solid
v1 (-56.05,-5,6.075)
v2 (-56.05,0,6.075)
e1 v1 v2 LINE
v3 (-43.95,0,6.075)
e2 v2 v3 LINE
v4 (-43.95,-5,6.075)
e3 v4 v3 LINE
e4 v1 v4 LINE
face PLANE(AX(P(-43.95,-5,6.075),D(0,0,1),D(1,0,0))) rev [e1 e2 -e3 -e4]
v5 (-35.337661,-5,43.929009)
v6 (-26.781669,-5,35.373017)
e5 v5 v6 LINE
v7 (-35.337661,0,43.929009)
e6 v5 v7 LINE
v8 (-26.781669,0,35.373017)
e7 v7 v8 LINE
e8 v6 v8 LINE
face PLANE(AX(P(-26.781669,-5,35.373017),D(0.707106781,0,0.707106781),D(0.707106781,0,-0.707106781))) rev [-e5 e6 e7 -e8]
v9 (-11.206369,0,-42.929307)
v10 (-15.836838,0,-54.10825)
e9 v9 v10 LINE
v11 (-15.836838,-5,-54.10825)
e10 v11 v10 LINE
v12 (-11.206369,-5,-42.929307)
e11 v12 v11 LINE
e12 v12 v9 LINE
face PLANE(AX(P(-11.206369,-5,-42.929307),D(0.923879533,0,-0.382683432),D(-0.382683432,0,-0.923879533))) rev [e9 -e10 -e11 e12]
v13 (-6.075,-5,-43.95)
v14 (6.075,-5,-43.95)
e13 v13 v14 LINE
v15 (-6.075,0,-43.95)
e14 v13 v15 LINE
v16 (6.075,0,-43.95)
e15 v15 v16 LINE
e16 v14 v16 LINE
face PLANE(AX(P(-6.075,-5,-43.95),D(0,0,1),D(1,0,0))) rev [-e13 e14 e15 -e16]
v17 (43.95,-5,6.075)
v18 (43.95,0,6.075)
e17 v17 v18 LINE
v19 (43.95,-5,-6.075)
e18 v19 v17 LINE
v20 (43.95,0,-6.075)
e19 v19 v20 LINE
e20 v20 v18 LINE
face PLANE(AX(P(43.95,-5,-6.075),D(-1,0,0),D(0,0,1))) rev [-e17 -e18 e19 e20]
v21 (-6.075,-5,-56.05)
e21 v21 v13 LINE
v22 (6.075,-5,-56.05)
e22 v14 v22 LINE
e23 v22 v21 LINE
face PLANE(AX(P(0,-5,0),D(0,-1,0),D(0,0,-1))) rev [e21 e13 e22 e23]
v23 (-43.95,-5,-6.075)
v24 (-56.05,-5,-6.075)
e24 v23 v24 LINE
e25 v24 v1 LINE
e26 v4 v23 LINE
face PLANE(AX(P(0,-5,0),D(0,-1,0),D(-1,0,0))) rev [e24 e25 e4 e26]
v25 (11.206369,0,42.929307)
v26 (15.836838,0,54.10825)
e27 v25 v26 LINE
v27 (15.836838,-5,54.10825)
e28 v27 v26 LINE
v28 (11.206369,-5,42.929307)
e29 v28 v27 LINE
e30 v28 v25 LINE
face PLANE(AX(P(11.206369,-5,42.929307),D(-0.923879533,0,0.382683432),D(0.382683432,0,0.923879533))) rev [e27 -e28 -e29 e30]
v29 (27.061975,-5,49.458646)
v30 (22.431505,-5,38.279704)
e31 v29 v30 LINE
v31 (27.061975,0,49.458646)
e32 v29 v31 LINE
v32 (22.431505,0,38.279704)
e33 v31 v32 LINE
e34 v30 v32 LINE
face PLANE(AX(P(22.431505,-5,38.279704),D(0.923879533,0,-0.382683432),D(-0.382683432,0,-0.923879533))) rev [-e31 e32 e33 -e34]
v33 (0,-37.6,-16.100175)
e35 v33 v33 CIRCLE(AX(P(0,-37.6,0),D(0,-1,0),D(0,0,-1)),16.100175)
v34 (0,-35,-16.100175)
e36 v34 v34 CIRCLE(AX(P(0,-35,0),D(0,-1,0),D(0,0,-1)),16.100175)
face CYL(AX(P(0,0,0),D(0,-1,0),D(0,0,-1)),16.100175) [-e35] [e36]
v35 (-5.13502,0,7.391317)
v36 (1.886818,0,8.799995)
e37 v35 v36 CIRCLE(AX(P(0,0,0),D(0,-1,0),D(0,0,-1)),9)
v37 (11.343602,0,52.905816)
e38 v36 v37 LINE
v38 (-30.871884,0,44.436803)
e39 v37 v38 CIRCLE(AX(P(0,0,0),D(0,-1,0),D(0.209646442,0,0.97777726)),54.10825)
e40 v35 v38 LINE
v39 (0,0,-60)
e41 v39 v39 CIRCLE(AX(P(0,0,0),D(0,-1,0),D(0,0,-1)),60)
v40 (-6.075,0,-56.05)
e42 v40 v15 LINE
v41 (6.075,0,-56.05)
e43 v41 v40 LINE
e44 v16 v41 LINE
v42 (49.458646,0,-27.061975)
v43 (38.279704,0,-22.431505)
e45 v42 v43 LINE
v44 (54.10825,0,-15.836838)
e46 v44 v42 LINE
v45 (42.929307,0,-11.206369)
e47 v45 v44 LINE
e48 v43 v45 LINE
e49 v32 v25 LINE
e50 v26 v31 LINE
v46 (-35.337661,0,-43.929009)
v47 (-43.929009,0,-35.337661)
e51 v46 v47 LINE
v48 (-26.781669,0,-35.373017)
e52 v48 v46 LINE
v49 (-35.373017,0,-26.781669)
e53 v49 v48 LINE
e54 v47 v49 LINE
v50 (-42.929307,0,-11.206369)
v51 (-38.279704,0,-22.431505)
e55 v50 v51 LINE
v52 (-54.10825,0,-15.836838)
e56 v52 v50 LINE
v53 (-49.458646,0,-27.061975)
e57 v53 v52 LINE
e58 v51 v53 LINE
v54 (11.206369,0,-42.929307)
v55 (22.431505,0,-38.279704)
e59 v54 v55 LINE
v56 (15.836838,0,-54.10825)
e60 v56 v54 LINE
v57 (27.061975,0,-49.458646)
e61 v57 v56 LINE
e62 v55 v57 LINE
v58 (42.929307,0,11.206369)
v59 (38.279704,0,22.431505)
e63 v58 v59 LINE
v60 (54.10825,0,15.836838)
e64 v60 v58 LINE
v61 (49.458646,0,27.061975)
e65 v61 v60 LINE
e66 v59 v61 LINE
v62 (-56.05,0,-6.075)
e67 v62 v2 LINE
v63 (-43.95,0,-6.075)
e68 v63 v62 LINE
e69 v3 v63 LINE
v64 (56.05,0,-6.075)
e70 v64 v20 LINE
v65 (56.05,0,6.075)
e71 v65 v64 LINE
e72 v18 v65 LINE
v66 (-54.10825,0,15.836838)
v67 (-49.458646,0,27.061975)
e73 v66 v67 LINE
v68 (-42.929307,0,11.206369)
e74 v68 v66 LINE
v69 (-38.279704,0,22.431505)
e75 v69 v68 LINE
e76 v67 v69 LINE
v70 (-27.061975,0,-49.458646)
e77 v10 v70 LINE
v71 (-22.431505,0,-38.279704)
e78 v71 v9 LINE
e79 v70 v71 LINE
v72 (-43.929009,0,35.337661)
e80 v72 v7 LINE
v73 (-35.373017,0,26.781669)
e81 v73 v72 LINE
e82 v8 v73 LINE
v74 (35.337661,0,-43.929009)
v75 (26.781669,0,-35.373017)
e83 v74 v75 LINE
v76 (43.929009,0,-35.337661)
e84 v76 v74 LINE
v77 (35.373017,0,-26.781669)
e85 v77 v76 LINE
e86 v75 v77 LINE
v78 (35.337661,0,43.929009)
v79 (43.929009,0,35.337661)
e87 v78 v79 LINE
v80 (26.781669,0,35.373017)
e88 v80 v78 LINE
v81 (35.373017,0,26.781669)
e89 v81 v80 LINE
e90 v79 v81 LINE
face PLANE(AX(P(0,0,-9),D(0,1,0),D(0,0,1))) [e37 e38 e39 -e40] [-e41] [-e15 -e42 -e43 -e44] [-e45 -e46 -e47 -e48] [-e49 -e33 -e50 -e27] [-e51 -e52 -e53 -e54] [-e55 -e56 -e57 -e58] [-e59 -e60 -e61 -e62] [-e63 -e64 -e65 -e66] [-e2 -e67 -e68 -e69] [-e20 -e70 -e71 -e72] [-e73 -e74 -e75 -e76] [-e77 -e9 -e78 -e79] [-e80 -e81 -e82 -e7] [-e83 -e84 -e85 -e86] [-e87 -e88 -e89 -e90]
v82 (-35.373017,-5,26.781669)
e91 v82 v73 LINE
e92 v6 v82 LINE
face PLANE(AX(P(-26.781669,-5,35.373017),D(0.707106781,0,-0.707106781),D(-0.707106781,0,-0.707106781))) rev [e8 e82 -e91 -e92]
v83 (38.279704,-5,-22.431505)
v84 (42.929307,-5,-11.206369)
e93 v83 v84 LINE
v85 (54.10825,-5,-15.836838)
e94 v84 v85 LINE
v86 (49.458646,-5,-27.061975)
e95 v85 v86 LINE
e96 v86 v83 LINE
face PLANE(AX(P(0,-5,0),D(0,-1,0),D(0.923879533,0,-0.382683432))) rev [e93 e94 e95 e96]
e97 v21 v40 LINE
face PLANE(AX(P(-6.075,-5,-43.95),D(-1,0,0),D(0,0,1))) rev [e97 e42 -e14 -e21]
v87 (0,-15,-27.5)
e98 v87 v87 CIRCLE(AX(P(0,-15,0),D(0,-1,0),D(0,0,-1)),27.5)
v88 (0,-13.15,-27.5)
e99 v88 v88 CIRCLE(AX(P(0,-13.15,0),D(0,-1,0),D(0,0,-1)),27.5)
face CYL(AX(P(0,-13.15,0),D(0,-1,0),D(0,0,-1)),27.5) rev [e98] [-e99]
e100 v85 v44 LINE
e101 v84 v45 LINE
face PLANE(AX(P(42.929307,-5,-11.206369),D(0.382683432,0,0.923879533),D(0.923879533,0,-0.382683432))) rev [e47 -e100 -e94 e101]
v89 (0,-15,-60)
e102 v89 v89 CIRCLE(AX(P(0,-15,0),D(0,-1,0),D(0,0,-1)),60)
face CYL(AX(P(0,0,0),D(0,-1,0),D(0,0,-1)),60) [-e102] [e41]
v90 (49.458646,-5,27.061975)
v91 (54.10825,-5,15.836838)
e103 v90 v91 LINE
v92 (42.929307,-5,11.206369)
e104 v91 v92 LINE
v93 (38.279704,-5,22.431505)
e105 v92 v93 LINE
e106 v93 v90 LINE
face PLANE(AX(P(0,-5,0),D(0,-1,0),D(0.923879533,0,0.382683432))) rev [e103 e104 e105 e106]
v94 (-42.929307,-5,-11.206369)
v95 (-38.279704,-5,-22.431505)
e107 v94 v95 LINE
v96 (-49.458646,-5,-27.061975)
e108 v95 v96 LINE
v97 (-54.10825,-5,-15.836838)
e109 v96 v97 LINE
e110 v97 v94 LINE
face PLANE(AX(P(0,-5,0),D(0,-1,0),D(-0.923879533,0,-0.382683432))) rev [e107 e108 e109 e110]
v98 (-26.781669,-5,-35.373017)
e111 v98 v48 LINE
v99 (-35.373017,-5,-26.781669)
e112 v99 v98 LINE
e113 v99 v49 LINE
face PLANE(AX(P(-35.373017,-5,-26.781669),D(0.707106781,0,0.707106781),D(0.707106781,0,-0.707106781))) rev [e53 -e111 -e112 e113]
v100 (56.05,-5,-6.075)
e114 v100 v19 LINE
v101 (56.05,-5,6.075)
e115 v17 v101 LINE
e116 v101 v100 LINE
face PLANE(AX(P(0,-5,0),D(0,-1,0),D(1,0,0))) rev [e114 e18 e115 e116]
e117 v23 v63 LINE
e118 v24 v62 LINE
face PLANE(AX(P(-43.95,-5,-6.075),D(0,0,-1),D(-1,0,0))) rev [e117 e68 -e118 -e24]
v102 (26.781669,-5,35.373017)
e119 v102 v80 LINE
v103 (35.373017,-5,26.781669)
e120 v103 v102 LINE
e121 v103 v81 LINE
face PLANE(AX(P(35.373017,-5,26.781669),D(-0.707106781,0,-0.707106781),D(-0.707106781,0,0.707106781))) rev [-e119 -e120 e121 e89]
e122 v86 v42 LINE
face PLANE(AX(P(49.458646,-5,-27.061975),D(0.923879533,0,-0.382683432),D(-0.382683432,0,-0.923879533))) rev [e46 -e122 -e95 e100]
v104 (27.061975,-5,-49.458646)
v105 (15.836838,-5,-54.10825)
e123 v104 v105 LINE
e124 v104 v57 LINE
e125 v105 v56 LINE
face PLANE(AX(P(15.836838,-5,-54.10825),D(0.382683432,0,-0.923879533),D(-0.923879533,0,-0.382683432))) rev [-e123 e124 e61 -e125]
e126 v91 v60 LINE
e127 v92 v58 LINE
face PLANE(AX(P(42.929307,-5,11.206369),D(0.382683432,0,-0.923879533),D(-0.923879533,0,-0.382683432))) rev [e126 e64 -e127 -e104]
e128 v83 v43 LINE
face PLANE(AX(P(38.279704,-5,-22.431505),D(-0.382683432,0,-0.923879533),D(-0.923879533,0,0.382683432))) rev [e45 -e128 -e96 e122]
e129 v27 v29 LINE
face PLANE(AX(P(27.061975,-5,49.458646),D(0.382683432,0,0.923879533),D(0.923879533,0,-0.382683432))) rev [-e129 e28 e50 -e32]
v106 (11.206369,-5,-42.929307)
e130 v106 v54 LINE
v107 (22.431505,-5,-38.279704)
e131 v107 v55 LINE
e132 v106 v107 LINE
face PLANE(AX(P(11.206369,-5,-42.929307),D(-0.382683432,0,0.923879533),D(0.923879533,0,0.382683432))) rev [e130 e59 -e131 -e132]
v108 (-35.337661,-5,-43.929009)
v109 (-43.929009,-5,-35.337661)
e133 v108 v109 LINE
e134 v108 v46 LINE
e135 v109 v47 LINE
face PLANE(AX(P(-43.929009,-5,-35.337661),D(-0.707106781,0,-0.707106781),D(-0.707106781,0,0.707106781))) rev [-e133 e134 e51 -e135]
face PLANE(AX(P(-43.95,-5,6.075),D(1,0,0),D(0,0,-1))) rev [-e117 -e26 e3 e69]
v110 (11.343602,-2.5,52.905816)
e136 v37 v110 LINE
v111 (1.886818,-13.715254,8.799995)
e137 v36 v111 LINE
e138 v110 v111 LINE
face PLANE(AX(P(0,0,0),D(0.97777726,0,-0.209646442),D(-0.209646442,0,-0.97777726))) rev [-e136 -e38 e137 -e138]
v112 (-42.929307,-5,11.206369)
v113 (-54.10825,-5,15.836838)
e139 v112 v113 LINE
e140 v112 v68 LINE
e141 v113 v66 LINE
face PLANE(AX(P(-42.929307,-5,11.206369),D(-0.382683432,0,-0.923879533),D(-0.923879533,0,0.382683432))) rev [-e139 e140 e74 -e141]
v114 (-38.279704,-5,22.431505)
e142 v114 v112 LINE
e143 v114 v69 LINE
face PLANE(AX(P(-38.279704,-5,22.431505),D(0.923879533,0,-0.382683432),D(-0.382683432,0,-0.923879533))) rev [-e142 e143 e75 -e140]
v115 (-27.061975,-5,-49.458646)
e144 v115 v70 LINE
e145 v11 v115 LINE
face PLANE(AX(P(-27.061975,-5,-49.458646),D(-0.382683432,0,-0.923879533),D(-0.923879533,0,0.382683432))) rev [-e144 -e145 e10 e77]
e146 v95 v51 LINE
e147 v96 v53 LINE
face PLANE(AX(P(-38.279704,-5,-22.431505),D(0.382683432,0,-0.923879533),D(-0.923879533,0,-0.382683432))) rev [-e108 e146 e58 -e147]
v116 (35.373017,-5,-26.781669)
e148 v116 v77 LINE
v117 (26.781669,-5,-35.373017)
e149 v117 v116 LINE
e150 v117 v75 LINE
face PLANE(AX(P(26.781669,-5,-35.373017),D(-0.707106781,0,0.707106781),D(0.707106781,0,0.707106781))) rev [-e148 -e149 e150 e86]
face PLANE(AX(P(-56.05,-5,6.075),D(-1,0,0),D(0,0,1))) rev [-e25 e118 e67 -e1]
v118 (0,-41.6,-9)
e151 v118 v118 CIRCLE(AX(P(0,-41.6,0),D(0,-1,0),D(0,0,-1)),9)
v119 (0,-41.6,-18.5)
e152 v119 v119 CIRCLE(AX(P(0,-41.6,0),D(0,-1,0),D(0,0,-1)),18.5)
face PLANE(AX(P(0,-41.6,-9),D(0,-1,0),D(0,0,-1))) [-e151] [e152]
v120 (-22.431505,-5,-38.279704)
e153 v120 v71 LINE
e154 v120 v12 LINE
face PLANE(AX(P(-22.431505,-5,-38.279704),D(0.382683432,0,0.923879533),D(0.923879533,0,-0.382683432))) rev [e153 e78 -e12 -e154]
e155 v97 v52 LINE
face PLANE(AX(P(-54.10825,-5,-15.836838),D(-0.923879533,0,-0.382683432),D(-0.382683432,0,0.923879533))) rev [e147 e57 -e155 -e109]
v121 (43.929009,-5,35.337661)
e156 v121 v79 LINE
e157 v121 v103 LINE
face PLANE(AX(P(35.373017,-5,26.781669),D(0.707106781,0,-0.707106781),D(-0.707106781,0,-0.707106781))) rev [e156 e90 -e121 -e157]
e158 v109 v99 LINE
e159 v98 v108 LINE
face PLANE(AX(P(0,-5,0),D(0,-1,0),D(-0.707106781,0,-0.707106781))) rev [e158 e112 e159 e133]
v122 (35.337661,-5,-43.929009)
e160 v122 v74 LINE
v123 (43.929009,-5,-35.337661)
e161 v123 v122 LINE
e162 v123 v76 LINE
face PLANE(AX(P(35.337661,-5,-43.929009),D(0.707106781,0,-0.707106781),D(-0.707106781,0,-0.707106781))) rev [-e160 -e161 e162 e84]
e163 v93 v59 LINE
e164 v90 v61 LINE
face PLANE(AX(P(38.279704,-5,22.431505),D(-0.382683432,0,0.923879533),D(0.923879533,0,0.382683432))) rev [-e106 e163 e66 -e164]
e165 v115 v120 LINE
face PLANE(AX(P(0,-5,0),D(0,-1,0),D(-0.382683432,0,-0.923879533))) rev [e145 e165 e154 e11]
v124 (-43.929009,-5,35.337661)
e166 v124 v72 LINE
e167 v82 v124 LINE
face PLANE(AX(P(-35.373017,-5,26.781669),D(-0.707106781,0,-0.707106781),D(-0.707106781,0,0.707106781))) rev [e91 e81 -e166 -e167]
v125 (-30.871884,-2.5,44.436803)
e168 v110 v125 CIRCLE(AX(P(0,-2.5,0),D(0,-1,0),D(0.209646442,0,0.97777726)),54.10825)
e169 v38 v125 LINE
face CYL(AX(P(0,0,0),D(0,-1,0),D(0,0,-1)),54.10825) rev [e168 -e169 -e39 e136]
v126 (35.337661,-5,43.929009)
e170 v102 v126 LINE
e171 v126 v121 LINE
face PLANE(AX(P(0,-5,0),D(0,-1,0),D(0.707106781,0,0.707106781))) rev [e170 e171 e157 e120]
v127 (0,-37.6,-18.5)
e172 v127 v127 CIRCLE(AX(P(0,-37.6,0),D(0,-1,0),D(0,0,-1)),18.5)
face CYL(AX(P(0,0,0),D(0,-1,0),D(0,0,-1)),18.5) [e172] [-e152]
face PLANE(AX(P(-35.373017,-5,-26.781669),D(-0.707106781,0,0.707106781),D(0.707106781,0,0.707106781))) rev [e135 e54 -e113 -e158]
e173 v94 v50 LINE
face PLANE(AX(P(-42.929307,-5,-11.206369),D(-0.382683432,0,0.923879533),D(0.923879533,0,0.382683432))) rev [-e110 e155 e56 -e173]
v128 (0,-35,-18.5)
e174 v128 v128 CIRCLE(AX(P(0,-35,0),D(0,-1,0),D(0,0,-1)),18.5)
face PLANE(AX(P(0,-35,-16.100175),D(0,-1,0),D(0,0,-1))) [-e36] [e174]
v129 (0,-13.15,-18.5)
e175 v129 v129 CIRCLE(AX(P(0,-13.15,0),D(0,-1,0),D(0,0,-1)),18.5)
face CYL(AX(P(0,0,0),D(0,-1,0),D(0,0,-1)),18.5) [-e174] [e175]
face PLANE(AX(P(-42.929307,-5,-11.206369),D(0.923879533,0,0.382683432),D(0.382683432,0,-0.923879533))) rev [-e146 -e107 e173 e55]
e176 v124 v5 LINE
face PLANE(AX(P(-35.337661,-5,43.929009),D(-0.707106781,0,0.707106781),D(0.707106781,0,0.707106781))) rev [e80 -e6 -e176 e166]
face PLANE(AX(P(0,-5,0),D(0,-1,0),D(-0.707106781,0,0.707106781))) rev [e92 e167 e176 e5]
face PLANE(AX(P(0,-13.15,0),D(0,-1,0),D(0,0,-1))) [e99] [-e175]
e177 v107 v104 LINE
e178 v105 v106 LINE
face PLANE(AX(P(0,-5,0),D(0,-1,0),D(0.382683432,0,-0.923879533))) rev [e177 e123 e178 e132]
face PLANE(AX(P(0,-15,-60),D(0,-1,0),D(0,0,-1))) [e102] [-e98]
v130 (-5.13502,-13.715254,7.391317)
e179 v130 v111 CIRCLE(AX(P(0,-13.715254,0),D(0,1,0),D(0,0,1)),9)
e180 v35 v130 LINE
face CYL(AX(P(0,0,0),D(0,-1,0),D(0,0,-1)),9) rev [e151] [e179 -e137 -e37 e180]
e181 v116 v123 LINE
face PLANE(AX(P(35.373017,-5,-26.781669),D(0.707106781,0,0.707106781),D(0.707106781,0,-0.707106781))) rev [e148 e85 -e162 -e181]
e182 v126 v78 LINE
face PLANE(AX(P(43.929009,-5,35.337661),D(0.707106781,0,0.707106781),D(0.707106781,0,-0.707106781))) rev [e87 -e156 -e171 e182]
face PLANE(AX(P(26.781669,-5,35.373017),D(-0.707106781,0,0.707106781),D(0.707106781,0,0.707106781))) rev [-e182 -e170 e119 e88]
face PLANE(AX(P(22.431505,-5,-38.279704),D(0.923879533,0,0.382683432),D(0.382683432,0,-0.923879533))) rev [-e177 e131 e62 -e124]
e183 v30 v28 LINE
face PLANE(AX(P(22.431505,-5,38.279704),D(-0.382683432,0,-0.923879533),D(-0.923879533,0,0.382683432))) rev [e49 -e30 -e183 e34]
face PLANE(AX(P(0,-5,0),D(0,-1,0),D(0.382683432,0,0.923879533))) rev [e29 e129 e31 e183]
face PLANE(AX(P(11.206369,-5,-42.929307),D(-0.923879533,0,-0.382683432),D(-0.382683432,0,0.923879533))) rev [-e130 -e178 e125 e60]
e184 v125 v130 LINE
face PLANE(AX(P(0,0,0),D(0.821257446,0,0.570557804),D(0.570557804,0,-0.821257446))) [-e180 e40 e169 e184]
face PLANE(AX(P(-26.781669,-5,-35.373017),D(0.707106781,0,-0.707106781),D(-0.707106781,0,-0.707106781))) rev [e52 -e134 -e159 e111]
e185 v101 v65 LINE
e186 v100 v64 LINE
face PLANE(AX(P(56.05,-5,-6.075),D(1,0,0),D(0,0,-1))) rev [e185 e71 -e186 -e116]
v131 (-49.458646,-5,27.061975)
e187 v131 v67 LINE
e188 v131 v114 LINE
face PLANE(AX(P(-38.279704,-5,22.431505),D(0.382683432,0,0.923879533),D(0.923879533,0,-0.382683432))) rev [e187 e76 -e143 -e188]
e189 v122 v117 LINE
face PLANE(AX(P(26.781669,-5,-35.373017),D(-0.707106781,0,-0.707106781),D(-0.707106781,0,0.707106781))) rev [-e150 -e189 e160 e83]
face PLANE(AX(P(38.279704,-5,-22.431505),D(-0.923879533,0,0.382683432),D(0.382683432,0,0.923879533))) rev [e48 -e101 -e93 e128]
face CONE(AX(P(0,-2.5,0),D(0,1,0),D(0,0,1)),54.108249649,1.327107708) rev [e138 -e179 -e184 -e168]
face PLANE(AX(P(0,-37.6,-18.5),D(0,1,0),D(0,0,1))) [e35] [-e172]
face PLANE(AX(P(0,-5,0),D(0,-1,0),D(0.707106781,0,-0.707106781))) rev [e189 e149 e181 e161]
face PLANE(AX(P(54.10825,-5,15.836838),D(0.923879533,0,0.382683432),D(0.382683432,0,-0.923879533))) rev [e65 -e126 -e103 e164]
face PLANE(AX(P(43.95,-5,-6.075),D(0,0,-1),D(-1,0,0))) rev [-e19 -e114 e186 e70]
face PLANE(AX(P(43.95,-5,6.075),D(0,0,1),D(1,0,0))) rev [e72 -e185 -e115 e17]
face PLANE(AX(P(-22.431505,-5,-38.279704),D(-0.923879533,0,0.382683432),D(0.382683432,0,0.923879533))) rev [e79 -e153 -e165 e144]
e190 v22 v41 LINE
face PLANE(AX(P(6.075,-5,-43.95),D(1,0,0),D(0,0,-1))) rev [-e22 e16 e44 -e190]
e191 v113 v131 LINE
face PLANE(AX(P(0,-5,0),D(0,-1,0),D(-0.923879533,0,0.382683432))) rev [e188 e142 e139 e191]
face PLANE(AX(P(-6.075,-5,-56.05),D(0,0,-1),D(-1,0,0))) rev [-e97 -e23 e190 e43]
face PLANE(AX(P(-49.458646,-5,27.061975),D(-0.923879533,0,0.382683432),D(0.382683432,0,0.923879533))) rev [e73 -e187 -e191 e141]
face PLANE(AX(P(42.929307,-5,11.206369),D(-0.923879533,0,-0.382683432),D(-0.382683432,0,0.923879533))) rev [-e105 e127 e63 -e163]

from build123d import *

# Parameters (mm, degrees)
SKETCH3_W          = 12.15
SKETCH3_H          = 12.1
CUT_EXTRUDE1_DEPTH = 5
CIRPATTERN1_COUNT  = 16
CUT_SWEEP3_ANGLE   = 46.890766
SKETCH8_R          = 27.5
SKETCH8_R_2        = 18.5
CUT_EXTRUDE2_DEPTH = 1.85


# Read off the part's stored shape, not the designer's step: Cut-Sweep3
with BuildPart() as part:
    # Sketch1 → Revolve1 (revolve)
    with BuildSketch(Plane(origin=(0, 0, 0), x_dir=(0, 0, -1), z_dir=(1, 0, 0))):
        Polygon((9, 0), (60, 0), (60, -15), (18.5, -15), (18.5, -35), (16.100175422, -35), (16.100175422, -37.6), (18.5, -37.6), (18.5, -41.6), (9, -41.6), align=None)
    revolve(axis=Axis((0, 0, 0), (0, 1, 0)))

    # Sketch3 → Cut-Extrude1 (cut)
    with BuildSketch(Plane(origin=(0, 0, 0), x_dir=(1, 0, 0), z_dir=(0, 1, 0))):
        with Locations((0, 50)):
            Rectangle(SKETCH3_W, SKETCH3_H)
    cut_extrude1 = extrude(amount=-CUT_EXTRUDE1_DEPTH, mode=Mode.SUBTRACT)

    # CirPattern1: Cut-Extrude1 ×16 about axis, 2 skipped
    cirpattern1_axis = Axis((0, 0, 0), (0, -1, 0))
    add([cut_extrude1.rotate(cirpattern1_axis, i * 360 / CIRPATTERN1_COUNT) for i in range(1, CIRPATTERN1_COUNT) if i not in (8, 9)], mode=Mode.SUBTRACT)

    # Cut-Sweep3 outline → Cut-Sweep3 (revolve, cut)
    with BuildSketch(Plane(origin=(0, 0, 0), x_dir=(-0.5705578043075098, 0, 0.8212574455941287), z_dir=(-0.8212574455941287, 0, -0.5705578043075098))):
        Polygon((54.108249649, -2.5), (54.108249649, 0), (9, 0), (9, -13.715253714), align=None)
    revolve(axis=Axis((0, 0, 0), (0, 1, 0)), revolution_arc=CUT_SWEEP3_ANGLE, mode=Mode.SUBTRACT)

    # Sketch8 → Cut-Extrude2 (cut)
    with BuildSketch(Plane.XZ.offset(15)):
        with Locations(Location((0, 0, 0), (0, 0, 270))):
            Circle(SKETCH8_R)
        with Locations(Location((0, 0, 0), (0, 0, 270))):
            Circle(SKETCH8_R_2, mode=Mode.SUBTRACT)
    extrude(amount=-CUT_EXTRUDE2_DEPTH, mode=Mode.SUBTRACT)


solid = part.part
